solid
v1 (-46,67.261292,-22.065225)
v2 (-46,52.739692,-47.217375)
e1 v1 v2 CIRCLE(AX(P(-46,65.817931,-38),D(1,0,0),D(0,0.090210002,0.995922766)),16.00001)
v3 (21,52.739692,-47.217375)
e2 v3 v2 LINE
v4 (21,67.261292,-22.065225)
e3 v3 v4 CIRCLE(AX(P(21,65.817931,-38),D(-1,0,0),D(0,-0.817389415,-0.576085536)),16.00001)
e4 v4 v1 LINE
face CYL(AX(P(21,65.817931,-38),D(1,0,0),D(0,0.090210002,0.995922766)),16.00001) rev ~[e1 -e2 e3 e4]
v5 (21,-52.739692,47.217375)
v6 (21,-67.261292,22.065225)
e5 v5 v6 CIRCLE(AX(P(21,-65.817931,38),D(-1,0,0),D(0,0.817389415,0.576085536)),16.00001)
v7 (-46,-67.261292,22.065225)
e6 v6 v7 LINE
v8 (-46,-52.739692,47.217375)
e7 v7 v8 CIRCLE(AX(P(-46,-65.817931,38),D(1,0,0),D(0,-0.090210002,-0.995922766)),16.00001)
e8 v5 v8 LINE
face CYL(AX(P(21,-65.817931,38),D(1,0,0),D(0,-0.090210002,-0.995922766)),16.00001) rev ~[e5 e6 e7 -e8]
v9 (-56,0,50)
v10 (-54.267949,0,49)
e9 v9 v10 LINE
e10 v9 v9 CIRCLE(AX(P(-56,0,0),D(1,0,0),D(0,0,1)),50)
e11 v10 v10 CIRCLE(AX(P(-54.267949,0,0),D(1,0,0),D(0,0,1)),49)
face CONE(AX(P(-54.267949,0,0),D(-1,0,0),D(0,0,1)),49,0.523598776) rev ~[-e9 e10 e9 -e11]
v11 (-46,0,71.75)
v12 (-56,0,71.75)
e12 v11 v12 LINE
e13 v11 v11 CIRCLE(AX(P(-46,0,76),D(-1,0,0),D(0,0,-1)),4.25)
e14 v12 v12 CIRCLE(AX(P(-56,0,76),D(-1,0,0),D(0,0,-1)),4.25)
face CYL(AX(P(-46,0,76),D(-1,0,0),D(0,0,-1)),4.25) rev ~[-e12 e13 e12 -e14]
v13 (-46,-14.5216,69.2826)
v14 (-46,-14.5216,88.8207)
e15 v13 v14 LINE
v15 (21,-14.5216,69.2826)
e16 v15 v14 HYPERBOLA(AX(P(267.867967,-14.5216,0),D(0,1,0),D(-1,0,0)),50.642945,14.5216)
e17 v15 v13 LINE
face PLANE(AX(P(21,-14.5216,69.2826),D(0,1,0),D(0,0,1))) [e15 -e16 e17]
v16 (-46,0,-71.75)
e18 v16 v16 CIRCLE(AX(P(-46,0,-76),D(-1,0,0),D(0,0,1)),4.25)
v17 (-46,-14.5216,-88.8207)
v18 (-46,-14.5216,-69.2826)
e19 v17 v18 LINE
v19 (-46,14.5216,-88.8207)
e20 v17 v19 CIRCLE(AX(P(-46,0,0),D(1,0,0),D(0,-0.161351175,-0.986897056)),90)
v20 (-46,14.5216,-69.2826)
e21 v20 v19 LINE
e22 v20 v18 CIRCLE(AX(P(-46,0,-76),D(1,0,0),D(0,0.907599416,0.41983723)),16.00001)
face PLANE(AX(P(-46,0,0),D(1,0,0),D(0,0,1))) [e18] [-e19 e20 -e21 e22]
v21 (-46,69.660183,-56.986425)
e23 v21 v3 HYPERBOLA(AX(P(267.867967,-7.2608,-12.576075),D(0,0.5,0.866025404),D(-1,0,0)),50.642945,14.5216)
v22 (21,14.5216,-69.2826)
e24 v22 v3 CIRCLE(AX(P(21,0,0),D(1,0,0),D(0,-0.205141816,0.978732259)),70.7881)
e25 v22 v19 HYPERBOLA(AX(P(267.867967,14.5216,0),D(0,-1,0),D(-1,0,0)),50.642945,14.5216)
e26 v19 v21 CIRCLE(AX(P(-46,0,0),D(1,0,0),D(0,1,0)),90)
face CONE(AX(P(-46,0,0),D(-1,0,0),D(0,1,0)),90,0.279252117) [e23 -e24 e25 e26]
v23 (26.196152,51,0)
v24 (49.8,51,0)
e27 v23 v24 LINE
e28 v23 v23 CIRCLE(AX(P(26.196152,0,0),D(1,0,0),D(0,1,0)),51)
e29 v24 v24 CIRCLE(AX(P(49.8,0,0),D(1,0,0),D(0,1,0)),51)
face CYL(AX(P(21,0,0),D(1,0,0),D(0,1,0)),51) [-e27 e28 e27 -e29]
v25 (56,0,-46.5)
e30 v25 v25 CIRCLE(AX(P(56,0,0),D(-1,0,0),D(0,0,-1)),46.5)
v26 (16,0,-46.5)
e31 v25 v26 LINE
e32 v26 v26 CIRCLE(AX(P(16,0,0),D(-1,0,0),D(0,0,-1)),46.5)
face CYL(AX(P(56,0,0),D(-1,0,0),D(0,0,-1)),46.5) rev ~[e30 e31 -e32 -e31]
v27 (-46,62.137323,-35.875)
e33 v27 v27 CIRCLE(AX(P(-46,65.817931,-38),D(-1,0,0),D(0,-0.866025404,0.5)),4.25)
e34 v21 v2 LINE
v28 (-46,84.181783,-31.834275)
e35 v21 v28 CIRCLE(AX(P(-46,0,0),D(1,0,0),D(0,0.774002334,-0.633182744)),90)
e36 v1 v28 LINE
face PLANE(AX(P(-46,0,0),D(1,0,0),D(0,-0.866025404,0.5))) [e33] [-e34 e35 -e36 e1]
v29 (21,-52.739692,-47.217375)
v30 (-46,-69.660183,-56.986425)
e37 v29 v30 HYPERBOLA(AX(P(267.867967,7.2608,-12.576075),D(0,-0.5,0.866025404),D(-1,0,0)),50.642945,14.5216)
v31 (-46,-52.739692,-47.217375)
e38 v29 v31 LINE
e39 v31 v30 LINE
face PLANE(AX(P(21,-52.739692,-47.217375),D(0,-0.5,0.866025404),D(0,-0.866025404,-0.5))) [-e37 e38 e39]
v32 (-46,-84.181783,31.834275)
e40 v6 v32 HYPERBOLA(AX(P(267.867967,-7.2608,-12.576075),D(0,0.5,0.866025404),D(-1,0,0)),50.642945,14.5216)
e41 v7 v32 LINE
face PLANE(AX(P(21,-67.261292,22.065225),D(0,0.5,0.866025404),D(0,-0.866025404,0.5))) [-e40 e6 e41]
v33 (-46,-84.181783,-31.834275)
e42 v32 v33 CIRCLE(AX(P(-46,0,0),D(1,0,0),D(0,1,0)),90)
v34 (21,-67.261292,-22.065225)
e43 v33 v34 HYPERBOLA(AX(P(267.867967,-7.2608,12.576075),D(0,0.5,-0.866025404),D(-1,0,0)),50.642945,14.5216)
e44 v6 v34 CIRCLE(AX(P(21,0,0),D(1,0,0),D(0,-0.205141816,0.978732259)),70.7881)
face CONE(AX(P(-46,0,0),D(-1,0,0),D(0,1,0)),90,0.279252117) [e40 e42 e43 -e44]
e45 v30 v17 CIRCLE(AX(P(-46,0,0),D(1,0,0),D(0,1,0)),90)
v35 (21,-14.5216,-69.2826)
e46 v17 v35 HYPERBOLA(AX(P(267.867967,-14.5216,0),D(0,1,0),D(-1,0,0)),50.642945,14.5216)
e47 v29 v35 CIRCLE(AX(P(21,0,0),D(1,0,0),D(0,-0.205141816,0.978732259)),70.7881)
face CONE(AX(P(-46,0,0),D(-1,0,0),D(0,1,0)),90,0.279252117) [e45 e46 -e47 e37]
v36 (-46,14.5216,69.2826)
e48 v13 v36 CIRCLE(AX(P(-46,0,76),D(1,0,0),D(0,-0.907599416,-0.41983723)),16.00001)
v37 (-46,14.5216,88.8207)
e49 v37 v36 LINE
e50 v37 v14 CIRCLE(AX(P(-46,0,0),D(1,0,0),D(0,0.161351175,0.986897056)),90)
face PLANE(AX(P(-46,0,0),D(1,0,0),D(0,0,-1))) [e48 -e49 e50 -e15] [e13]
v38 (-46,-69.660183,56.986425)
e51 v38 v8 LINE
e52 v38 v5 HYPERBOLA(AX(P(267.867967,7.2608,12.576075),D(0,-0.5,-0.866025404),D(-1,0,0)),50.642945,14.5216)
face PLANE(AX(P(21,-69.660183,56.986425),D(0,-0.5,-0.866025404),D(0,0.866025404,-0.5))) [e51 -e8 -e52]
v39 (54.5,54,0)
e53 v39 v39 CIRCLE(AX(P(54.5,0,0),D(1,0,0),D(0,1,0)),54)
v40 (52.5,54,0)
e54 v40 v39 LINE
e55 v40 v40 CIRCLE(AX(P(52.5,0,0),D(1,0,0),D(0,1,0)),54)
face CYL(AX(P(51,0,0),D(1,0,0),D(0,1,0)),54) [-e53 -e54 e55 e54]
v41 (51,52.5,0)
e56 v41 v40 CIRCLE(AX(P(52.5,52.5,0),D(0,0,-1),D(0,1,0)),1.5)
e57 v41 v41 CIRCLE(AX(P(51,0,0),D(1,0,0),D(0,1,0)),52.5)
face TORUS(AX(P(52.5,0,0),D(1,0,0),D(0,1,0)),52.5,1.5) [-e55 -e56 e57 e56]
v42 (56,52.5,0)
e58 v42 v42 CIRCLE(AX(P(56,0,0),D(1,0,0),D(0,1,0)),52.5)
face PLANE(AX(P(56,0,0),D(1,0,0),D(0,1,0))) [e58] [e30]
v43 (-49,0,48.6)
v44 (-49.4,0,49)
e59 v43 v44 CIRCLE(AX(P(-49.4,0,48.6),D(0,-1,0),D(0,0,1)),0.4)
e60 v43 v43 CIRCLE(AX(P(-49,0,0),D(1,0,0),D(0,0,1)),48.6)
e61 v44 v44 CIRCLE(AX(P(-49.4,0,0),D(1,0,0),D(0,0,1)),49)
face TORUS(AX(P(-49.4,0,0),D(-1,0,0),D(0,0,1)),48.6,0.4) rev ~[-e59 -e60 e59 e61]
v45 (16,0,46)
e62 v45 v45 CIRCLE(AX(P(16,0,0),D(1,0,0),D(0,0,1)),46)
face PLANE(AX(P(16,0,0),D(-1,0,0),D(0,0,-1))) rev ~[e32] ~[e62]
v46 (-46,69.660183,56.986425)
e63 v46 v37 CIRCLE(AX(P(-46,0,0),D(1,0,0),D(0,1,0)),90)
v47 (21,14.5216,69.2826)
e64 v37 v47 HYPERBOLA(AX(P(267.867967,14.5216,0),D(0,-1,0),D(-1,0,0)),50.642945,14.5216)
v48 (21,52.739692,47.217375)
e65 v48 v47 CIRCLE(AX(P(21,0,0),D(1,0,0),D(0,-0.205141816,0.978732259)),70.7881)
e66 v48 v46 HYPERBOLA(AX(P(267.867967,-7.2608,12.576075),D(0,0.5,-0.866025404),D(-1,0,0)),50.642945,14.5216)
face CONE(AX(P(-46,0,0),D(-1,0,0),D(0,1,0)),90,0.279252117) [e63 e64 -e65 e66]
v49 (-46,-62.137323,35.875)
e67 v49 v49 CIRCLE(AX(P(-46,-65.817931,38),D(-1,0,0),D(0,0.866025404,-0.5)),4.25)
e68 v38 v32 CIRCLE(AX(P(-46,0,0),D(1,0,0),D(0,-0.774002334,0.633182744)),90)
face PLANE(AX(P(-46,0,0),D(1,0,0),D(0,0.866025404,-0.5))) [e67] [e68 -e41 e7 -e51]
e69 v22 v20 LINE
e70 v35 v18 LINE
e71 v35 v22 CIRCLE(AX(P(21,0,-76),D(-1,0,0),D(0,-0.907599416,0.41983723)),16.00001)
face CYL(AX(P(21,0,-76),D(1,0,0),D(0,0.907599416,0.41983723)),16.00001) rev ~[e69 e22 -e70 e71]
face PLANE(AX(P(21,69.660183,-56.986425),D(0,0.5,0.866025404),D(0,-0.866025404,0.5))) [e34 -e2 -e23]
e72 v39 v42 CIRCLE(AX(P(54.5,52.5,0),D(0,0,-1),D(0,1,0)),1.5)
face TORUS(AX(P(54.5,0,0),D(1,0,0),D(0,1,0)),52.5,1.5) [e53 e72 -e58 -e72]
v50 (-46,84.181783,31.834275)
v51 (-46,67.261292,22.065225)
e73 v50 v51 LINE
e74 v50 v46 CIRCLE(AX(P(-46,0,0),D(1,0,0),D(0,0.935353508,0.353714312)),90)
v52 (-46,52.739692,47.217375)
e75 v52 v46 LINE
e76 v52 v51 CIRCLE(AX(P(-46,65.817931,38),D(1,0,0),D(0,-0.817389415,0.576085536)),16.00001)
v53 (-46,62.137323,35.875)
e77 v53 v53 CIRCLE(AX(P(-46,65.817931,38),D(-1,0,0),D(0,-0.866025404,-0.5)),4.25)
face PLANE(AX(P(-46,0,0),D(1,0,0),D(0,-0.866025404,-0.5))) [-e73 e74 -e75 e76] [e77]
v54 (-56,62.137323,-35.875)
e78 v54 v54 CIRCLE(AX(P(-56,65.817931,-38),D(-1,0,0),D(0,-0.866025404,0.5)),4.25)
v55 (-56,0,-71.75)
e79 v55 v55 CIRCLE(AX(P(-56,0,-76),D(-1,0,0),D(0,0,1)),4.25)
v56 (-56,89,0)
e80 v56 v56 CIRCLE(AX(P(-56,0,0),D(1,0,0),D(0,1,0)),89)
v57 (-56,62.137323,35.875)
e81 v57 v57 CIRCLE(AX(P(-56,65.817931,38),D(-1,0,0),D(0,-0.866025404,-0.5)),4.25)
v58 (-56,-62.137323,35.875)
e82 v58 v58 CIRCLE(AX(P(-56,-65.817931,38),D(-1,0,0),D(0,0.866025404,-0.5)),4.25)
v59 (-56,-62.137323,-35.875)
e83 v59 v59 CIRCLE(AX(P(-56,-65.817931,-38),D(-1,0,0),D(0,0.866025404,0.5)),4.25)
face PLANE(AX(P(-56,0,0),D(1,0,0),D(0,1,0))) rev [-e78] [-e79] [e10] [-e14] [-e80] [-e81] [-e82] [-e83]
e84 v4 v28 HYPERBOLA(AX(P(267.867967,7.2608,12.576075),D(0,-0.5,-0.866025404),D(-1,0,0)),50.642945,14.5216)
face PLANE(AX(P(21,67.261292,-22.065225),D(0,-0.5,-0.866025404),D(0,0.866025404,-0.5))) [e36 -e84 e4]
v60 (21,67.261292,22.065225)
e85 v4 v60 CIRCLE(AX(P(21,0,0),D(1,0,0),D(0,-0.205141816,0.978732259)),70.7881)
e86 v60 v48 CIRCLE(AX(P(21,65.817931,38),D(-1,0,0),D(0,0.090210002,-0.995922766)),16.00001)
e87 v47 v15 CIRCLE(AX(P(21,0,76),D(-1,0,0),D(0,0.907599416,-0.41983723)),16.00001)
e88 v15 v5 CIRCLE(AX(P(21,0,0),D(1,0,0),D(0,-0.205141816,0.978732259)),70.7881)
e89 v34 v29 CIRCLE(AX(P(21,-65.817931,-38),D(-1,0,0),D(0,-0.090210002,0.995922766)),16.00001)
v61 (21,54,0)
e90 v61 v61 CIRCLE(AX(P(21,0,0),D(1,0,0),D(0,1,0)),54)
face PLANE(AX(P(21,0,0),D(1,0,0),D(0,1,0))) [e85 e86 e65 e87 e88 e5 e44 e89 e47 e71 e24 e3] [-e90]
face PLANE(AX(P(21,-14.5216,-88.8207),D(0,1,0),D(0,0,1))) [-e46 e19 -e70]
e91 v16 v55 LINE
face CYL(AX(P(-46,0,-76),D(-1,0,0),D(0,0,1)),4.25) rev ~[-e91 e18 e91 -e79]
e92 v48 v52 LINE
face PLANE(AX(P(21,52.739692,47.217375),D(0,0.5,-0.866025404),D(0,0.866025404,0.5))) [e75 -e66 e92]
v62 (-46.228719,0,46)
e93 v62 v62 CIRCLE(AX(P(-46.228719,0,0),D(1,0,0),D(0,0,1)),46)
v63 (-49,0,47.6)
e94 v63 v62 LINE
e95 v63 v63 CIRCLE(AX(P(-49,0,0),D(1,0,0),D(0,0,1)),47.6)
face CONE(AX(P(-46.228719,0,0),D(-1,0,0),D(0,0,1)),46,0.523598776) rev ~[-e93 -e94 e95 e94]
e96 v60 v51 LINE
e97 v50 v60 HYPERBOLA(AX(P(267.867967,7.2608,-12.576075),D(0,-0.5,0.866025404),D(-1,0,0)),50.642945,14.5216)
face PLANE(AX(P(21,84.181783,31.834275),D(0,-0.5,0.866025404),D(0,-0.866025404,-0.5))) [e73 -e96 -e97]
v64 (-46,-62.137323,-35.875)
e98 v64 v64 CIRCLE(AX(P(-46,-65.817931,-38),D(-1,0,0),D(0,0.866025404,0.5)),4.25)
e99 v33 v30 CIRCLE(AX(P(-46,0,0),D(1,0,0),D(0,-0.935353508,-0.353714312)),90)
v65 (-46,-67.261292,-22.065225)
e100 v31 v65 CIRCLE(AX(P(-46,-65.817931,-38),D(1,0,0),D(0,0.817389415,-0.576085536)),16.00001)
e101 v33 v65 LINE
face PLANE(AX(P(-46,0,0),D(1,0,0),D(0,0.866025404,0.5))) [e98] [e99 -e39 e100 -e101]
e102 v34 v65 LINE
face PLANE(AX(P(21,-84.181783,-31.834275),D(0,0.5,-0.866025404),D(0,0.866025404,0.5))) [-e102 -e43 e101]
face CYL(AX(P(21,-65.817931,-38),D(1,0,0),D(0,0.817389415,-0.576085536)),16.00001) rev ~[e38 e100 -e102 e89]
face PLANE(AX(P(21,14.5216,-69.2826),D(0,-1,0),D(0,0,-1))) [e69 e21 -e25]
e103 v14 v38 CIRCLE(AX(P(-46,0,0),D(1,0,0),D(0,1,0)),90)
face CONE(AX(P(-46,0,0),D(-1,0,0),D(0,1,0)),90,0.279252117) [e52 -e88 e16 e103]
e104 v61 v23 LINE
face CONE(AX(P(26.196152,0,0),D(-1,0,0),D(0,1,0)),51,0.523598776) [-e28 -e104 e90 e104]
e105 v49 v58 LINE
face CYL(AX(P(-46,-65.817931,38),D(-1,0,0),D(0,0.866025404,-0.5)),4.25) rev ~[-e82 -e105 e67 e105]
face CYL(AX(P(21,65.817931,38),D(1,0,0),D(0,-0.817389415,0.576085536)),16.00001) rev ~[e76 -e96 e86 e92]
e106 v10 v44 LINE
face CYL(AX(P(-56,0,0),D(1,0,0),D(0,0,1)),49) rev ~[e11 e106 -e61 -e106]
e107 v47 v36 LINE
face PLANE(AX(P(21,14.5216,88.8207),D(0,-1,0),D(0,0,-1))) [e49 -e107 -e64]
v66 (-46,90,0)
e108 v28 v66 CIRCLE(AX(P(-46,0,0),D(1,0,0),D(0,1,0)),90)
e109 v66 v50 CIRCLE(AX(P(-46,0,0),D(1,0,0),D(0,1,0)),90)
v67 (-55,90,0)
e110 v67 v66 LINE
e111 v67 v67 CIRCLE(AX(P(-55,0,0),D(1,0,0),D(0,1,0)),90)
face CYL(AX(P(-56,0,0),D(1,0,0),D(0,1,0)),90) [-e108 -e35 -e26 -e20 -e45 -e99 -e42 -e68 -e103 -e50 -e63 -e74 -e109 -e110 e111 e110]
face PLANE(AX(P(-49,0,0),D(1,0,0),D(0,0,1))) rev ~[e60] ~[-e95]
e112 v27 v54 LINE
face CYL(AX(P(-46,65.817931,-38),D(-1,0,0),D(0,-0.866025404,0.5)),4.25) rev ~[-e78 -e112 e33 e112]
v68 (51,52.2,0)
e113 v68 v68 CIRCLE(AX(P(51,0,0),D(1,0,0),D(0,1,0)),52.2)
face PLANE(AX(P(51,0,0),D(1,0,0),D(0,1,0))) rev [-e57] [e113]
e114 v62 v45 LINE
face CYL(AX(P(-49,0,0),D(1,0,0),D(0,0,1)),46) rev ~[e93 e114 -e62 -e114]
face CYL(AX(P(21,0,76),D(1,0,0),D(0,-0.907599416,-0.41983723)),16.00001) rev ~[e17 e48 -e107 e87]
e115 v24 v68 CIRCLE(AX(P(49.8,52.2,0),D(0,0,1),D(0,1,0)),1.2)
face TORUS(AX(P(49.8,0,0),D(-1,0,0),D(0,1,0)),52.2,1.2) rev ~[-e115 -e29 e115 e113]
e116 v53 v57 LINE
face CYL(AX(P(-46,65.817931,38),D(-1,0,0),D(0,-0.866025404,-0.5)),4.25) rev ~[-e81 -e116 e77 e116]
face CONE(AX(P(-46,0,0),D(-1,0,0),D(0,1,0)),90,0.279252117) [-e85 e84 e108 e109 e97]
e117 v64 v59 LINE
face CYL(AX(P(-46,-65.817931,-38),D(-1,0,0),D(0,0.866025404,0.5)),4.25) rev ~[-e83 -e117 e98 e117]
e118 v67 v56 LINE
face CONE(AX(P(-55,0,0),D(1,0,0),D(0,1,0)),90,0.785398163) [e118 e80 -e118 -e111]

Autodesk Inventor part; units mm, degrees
ref_plane "YZ Plane" through (0, 0, 0) normal (1, 0, 0) x (0, 1, 0)
ref_plane "XZ Plane" through (0, 0, 0) normal (0, 1, 0) x (-1, 0, 0)
ref_plane "XY Plane" through (0, 0, 0) normal (0, 0, 1) x (1, 0, 0)
sketch "Skizze1" plane through (0, 0, 0) normal (0, 0, 1) x (1, 0, 0)
  line L0 (-56, 0) -> (-56, 90)
  line L1 (-56, 90) -> (-46, 90)
  line L2 (-46, 90) -> (21, 70.7881)
  line L3 (21, 70.7881) -> (21, 51)
  line L4 (21, 51) -> (51, 51)
  line L5 (51, 51) -> (51, 54)
  line L6 (51, 54) -> (56, 54)
  line L7 (56, 54) -> (56, 0)
  line L8 (-56, 0) -> (56, 0)
  point P0 (0, 0)
  point P1 (53.5, 54)
  point P2 (0, 0)
  dimension "d0" = 112
  dimension "d1" = 16
  dimension "d2" = 108
  dimension "d3" = 180
  dimension "d4" = 102
  dimension "d5" = 77
  dimension "d6" = 10
  dimension "d7" = 5
revolve "Umdrehung1" add sketch "Skizze1" angle 360 about axis through (-56, 0, 0) along (1, 0, 0)
fillet "Rundung1" radius 1.2 1 edges at (51, -51, 0)
fillet "Rundung2" radius 1.5 1 edges at (51, -54, 0)
fillet "Rundung3" radius 1.5 1 edges at (56, -54, 0)
sketch "Skizze2" plane through (21, 0, 0) normal (1, 0, 0) x (0, 0, -1)
  circle A0 centre (0, 0) radius 90 projected
  line L0 (126, 0) -> (-126, 0) projected
  circle A1 centre (0, 0) radius 90 projected
  circle A2 centre (0, 0) radius 70.7881 projected
  arc A3 (-69.2826, -14.5216) -> (-69.2826, 14.5216) centre (-76, 0) ccw
  line L1 (-88.8207, 14.5216) -> (-69.2826, 14.5216)
  line L2 (-69.2826, -14.5216) -> (-88.8207, -14.5216)
  point P0 (0, 0)
  point P1 (-79.0517, 14.5216)
  point P2 (-79.0517, 14.5216)
  dimension "d16" = 16
  dimension "d54" = 76
extrude "Extrusion3" cut sketch "Skizze2" against normal blind 67 contours L1 A2 L0 A0 | A0 L0 A2 L2 | A3 L0 A2 | A2 L0 A3 picked at (-76.7377, 8.0985) picked at (-76.7377, -8.0985) picked at (-67.2736, 2.8267) picked at (-67.2736, -2.8267)
sketch "Skizze9" plane through (-46, 0, 0) normal (1, 0, 0) x (0, 0, -1)
  arc A0 (-69.2826, -14.5216) -> (-69.2826, 14.5216) centre (-76, 0) ccw projected
  point P0 (0, 0)
hole "Bohrung3" at (-46, 0, 76) direction (-1, 0, 0) diameter 8.5 end through all
pattern_circular "Runde Anordnung1" count 6 over 360 about axis through (-12.5, 0, 0) along (1, 0, 0) of "Extrusion3", "Bohrung3"
chamfer "Fasen1" distance 1 angle 45 1 edges at (-56, -90, 0)
chamfer "Fasen3" distance 3 angle 60 1 edges at (21, -51, 0) measured on face at (21, 19.1412, 59.8068)
sketch "Skizze11" plane through (-56, 0, 0) normal (-1, 0, 0) x (0, 0, 1)
  circle A0 centre (0, 0) radius 90 projected
  point P0 (0, 0)
  point P1 (0, 0)
hole "Bohrung4" at (-56, 0, 0) direction (1, 0, 0) diameter 92 depth 79 counterbore diameter 98 counterbore depth 7
sketch "Skizze12" plane through (56, 0, 0) normal (1, 0, 0) x (0, 0, -1)
  circle A0 centre (0, 0) radius 54 projected
  point P0 (0, 0)
hole "Bohrung5" at (56, 0, 0) direction (-1, 0, 0) diameter 93 depth 40
chamfer "Fasen4" distance 1 angle 60 1 edges at (-56, 0, -49) measured on face at (-56, 18.4136, -67.5369)
chamfer "Fasen5" distance 1.6 angle 60 1 edges at (-49, 0, -46) measured on face at (-49, 0, -46.8427)
fillet "Rundung6" radius 0.4 1 edges at (-49, 0, -49)
properties part number "bauteil_externe" material "Stahl, galvanisiert"
